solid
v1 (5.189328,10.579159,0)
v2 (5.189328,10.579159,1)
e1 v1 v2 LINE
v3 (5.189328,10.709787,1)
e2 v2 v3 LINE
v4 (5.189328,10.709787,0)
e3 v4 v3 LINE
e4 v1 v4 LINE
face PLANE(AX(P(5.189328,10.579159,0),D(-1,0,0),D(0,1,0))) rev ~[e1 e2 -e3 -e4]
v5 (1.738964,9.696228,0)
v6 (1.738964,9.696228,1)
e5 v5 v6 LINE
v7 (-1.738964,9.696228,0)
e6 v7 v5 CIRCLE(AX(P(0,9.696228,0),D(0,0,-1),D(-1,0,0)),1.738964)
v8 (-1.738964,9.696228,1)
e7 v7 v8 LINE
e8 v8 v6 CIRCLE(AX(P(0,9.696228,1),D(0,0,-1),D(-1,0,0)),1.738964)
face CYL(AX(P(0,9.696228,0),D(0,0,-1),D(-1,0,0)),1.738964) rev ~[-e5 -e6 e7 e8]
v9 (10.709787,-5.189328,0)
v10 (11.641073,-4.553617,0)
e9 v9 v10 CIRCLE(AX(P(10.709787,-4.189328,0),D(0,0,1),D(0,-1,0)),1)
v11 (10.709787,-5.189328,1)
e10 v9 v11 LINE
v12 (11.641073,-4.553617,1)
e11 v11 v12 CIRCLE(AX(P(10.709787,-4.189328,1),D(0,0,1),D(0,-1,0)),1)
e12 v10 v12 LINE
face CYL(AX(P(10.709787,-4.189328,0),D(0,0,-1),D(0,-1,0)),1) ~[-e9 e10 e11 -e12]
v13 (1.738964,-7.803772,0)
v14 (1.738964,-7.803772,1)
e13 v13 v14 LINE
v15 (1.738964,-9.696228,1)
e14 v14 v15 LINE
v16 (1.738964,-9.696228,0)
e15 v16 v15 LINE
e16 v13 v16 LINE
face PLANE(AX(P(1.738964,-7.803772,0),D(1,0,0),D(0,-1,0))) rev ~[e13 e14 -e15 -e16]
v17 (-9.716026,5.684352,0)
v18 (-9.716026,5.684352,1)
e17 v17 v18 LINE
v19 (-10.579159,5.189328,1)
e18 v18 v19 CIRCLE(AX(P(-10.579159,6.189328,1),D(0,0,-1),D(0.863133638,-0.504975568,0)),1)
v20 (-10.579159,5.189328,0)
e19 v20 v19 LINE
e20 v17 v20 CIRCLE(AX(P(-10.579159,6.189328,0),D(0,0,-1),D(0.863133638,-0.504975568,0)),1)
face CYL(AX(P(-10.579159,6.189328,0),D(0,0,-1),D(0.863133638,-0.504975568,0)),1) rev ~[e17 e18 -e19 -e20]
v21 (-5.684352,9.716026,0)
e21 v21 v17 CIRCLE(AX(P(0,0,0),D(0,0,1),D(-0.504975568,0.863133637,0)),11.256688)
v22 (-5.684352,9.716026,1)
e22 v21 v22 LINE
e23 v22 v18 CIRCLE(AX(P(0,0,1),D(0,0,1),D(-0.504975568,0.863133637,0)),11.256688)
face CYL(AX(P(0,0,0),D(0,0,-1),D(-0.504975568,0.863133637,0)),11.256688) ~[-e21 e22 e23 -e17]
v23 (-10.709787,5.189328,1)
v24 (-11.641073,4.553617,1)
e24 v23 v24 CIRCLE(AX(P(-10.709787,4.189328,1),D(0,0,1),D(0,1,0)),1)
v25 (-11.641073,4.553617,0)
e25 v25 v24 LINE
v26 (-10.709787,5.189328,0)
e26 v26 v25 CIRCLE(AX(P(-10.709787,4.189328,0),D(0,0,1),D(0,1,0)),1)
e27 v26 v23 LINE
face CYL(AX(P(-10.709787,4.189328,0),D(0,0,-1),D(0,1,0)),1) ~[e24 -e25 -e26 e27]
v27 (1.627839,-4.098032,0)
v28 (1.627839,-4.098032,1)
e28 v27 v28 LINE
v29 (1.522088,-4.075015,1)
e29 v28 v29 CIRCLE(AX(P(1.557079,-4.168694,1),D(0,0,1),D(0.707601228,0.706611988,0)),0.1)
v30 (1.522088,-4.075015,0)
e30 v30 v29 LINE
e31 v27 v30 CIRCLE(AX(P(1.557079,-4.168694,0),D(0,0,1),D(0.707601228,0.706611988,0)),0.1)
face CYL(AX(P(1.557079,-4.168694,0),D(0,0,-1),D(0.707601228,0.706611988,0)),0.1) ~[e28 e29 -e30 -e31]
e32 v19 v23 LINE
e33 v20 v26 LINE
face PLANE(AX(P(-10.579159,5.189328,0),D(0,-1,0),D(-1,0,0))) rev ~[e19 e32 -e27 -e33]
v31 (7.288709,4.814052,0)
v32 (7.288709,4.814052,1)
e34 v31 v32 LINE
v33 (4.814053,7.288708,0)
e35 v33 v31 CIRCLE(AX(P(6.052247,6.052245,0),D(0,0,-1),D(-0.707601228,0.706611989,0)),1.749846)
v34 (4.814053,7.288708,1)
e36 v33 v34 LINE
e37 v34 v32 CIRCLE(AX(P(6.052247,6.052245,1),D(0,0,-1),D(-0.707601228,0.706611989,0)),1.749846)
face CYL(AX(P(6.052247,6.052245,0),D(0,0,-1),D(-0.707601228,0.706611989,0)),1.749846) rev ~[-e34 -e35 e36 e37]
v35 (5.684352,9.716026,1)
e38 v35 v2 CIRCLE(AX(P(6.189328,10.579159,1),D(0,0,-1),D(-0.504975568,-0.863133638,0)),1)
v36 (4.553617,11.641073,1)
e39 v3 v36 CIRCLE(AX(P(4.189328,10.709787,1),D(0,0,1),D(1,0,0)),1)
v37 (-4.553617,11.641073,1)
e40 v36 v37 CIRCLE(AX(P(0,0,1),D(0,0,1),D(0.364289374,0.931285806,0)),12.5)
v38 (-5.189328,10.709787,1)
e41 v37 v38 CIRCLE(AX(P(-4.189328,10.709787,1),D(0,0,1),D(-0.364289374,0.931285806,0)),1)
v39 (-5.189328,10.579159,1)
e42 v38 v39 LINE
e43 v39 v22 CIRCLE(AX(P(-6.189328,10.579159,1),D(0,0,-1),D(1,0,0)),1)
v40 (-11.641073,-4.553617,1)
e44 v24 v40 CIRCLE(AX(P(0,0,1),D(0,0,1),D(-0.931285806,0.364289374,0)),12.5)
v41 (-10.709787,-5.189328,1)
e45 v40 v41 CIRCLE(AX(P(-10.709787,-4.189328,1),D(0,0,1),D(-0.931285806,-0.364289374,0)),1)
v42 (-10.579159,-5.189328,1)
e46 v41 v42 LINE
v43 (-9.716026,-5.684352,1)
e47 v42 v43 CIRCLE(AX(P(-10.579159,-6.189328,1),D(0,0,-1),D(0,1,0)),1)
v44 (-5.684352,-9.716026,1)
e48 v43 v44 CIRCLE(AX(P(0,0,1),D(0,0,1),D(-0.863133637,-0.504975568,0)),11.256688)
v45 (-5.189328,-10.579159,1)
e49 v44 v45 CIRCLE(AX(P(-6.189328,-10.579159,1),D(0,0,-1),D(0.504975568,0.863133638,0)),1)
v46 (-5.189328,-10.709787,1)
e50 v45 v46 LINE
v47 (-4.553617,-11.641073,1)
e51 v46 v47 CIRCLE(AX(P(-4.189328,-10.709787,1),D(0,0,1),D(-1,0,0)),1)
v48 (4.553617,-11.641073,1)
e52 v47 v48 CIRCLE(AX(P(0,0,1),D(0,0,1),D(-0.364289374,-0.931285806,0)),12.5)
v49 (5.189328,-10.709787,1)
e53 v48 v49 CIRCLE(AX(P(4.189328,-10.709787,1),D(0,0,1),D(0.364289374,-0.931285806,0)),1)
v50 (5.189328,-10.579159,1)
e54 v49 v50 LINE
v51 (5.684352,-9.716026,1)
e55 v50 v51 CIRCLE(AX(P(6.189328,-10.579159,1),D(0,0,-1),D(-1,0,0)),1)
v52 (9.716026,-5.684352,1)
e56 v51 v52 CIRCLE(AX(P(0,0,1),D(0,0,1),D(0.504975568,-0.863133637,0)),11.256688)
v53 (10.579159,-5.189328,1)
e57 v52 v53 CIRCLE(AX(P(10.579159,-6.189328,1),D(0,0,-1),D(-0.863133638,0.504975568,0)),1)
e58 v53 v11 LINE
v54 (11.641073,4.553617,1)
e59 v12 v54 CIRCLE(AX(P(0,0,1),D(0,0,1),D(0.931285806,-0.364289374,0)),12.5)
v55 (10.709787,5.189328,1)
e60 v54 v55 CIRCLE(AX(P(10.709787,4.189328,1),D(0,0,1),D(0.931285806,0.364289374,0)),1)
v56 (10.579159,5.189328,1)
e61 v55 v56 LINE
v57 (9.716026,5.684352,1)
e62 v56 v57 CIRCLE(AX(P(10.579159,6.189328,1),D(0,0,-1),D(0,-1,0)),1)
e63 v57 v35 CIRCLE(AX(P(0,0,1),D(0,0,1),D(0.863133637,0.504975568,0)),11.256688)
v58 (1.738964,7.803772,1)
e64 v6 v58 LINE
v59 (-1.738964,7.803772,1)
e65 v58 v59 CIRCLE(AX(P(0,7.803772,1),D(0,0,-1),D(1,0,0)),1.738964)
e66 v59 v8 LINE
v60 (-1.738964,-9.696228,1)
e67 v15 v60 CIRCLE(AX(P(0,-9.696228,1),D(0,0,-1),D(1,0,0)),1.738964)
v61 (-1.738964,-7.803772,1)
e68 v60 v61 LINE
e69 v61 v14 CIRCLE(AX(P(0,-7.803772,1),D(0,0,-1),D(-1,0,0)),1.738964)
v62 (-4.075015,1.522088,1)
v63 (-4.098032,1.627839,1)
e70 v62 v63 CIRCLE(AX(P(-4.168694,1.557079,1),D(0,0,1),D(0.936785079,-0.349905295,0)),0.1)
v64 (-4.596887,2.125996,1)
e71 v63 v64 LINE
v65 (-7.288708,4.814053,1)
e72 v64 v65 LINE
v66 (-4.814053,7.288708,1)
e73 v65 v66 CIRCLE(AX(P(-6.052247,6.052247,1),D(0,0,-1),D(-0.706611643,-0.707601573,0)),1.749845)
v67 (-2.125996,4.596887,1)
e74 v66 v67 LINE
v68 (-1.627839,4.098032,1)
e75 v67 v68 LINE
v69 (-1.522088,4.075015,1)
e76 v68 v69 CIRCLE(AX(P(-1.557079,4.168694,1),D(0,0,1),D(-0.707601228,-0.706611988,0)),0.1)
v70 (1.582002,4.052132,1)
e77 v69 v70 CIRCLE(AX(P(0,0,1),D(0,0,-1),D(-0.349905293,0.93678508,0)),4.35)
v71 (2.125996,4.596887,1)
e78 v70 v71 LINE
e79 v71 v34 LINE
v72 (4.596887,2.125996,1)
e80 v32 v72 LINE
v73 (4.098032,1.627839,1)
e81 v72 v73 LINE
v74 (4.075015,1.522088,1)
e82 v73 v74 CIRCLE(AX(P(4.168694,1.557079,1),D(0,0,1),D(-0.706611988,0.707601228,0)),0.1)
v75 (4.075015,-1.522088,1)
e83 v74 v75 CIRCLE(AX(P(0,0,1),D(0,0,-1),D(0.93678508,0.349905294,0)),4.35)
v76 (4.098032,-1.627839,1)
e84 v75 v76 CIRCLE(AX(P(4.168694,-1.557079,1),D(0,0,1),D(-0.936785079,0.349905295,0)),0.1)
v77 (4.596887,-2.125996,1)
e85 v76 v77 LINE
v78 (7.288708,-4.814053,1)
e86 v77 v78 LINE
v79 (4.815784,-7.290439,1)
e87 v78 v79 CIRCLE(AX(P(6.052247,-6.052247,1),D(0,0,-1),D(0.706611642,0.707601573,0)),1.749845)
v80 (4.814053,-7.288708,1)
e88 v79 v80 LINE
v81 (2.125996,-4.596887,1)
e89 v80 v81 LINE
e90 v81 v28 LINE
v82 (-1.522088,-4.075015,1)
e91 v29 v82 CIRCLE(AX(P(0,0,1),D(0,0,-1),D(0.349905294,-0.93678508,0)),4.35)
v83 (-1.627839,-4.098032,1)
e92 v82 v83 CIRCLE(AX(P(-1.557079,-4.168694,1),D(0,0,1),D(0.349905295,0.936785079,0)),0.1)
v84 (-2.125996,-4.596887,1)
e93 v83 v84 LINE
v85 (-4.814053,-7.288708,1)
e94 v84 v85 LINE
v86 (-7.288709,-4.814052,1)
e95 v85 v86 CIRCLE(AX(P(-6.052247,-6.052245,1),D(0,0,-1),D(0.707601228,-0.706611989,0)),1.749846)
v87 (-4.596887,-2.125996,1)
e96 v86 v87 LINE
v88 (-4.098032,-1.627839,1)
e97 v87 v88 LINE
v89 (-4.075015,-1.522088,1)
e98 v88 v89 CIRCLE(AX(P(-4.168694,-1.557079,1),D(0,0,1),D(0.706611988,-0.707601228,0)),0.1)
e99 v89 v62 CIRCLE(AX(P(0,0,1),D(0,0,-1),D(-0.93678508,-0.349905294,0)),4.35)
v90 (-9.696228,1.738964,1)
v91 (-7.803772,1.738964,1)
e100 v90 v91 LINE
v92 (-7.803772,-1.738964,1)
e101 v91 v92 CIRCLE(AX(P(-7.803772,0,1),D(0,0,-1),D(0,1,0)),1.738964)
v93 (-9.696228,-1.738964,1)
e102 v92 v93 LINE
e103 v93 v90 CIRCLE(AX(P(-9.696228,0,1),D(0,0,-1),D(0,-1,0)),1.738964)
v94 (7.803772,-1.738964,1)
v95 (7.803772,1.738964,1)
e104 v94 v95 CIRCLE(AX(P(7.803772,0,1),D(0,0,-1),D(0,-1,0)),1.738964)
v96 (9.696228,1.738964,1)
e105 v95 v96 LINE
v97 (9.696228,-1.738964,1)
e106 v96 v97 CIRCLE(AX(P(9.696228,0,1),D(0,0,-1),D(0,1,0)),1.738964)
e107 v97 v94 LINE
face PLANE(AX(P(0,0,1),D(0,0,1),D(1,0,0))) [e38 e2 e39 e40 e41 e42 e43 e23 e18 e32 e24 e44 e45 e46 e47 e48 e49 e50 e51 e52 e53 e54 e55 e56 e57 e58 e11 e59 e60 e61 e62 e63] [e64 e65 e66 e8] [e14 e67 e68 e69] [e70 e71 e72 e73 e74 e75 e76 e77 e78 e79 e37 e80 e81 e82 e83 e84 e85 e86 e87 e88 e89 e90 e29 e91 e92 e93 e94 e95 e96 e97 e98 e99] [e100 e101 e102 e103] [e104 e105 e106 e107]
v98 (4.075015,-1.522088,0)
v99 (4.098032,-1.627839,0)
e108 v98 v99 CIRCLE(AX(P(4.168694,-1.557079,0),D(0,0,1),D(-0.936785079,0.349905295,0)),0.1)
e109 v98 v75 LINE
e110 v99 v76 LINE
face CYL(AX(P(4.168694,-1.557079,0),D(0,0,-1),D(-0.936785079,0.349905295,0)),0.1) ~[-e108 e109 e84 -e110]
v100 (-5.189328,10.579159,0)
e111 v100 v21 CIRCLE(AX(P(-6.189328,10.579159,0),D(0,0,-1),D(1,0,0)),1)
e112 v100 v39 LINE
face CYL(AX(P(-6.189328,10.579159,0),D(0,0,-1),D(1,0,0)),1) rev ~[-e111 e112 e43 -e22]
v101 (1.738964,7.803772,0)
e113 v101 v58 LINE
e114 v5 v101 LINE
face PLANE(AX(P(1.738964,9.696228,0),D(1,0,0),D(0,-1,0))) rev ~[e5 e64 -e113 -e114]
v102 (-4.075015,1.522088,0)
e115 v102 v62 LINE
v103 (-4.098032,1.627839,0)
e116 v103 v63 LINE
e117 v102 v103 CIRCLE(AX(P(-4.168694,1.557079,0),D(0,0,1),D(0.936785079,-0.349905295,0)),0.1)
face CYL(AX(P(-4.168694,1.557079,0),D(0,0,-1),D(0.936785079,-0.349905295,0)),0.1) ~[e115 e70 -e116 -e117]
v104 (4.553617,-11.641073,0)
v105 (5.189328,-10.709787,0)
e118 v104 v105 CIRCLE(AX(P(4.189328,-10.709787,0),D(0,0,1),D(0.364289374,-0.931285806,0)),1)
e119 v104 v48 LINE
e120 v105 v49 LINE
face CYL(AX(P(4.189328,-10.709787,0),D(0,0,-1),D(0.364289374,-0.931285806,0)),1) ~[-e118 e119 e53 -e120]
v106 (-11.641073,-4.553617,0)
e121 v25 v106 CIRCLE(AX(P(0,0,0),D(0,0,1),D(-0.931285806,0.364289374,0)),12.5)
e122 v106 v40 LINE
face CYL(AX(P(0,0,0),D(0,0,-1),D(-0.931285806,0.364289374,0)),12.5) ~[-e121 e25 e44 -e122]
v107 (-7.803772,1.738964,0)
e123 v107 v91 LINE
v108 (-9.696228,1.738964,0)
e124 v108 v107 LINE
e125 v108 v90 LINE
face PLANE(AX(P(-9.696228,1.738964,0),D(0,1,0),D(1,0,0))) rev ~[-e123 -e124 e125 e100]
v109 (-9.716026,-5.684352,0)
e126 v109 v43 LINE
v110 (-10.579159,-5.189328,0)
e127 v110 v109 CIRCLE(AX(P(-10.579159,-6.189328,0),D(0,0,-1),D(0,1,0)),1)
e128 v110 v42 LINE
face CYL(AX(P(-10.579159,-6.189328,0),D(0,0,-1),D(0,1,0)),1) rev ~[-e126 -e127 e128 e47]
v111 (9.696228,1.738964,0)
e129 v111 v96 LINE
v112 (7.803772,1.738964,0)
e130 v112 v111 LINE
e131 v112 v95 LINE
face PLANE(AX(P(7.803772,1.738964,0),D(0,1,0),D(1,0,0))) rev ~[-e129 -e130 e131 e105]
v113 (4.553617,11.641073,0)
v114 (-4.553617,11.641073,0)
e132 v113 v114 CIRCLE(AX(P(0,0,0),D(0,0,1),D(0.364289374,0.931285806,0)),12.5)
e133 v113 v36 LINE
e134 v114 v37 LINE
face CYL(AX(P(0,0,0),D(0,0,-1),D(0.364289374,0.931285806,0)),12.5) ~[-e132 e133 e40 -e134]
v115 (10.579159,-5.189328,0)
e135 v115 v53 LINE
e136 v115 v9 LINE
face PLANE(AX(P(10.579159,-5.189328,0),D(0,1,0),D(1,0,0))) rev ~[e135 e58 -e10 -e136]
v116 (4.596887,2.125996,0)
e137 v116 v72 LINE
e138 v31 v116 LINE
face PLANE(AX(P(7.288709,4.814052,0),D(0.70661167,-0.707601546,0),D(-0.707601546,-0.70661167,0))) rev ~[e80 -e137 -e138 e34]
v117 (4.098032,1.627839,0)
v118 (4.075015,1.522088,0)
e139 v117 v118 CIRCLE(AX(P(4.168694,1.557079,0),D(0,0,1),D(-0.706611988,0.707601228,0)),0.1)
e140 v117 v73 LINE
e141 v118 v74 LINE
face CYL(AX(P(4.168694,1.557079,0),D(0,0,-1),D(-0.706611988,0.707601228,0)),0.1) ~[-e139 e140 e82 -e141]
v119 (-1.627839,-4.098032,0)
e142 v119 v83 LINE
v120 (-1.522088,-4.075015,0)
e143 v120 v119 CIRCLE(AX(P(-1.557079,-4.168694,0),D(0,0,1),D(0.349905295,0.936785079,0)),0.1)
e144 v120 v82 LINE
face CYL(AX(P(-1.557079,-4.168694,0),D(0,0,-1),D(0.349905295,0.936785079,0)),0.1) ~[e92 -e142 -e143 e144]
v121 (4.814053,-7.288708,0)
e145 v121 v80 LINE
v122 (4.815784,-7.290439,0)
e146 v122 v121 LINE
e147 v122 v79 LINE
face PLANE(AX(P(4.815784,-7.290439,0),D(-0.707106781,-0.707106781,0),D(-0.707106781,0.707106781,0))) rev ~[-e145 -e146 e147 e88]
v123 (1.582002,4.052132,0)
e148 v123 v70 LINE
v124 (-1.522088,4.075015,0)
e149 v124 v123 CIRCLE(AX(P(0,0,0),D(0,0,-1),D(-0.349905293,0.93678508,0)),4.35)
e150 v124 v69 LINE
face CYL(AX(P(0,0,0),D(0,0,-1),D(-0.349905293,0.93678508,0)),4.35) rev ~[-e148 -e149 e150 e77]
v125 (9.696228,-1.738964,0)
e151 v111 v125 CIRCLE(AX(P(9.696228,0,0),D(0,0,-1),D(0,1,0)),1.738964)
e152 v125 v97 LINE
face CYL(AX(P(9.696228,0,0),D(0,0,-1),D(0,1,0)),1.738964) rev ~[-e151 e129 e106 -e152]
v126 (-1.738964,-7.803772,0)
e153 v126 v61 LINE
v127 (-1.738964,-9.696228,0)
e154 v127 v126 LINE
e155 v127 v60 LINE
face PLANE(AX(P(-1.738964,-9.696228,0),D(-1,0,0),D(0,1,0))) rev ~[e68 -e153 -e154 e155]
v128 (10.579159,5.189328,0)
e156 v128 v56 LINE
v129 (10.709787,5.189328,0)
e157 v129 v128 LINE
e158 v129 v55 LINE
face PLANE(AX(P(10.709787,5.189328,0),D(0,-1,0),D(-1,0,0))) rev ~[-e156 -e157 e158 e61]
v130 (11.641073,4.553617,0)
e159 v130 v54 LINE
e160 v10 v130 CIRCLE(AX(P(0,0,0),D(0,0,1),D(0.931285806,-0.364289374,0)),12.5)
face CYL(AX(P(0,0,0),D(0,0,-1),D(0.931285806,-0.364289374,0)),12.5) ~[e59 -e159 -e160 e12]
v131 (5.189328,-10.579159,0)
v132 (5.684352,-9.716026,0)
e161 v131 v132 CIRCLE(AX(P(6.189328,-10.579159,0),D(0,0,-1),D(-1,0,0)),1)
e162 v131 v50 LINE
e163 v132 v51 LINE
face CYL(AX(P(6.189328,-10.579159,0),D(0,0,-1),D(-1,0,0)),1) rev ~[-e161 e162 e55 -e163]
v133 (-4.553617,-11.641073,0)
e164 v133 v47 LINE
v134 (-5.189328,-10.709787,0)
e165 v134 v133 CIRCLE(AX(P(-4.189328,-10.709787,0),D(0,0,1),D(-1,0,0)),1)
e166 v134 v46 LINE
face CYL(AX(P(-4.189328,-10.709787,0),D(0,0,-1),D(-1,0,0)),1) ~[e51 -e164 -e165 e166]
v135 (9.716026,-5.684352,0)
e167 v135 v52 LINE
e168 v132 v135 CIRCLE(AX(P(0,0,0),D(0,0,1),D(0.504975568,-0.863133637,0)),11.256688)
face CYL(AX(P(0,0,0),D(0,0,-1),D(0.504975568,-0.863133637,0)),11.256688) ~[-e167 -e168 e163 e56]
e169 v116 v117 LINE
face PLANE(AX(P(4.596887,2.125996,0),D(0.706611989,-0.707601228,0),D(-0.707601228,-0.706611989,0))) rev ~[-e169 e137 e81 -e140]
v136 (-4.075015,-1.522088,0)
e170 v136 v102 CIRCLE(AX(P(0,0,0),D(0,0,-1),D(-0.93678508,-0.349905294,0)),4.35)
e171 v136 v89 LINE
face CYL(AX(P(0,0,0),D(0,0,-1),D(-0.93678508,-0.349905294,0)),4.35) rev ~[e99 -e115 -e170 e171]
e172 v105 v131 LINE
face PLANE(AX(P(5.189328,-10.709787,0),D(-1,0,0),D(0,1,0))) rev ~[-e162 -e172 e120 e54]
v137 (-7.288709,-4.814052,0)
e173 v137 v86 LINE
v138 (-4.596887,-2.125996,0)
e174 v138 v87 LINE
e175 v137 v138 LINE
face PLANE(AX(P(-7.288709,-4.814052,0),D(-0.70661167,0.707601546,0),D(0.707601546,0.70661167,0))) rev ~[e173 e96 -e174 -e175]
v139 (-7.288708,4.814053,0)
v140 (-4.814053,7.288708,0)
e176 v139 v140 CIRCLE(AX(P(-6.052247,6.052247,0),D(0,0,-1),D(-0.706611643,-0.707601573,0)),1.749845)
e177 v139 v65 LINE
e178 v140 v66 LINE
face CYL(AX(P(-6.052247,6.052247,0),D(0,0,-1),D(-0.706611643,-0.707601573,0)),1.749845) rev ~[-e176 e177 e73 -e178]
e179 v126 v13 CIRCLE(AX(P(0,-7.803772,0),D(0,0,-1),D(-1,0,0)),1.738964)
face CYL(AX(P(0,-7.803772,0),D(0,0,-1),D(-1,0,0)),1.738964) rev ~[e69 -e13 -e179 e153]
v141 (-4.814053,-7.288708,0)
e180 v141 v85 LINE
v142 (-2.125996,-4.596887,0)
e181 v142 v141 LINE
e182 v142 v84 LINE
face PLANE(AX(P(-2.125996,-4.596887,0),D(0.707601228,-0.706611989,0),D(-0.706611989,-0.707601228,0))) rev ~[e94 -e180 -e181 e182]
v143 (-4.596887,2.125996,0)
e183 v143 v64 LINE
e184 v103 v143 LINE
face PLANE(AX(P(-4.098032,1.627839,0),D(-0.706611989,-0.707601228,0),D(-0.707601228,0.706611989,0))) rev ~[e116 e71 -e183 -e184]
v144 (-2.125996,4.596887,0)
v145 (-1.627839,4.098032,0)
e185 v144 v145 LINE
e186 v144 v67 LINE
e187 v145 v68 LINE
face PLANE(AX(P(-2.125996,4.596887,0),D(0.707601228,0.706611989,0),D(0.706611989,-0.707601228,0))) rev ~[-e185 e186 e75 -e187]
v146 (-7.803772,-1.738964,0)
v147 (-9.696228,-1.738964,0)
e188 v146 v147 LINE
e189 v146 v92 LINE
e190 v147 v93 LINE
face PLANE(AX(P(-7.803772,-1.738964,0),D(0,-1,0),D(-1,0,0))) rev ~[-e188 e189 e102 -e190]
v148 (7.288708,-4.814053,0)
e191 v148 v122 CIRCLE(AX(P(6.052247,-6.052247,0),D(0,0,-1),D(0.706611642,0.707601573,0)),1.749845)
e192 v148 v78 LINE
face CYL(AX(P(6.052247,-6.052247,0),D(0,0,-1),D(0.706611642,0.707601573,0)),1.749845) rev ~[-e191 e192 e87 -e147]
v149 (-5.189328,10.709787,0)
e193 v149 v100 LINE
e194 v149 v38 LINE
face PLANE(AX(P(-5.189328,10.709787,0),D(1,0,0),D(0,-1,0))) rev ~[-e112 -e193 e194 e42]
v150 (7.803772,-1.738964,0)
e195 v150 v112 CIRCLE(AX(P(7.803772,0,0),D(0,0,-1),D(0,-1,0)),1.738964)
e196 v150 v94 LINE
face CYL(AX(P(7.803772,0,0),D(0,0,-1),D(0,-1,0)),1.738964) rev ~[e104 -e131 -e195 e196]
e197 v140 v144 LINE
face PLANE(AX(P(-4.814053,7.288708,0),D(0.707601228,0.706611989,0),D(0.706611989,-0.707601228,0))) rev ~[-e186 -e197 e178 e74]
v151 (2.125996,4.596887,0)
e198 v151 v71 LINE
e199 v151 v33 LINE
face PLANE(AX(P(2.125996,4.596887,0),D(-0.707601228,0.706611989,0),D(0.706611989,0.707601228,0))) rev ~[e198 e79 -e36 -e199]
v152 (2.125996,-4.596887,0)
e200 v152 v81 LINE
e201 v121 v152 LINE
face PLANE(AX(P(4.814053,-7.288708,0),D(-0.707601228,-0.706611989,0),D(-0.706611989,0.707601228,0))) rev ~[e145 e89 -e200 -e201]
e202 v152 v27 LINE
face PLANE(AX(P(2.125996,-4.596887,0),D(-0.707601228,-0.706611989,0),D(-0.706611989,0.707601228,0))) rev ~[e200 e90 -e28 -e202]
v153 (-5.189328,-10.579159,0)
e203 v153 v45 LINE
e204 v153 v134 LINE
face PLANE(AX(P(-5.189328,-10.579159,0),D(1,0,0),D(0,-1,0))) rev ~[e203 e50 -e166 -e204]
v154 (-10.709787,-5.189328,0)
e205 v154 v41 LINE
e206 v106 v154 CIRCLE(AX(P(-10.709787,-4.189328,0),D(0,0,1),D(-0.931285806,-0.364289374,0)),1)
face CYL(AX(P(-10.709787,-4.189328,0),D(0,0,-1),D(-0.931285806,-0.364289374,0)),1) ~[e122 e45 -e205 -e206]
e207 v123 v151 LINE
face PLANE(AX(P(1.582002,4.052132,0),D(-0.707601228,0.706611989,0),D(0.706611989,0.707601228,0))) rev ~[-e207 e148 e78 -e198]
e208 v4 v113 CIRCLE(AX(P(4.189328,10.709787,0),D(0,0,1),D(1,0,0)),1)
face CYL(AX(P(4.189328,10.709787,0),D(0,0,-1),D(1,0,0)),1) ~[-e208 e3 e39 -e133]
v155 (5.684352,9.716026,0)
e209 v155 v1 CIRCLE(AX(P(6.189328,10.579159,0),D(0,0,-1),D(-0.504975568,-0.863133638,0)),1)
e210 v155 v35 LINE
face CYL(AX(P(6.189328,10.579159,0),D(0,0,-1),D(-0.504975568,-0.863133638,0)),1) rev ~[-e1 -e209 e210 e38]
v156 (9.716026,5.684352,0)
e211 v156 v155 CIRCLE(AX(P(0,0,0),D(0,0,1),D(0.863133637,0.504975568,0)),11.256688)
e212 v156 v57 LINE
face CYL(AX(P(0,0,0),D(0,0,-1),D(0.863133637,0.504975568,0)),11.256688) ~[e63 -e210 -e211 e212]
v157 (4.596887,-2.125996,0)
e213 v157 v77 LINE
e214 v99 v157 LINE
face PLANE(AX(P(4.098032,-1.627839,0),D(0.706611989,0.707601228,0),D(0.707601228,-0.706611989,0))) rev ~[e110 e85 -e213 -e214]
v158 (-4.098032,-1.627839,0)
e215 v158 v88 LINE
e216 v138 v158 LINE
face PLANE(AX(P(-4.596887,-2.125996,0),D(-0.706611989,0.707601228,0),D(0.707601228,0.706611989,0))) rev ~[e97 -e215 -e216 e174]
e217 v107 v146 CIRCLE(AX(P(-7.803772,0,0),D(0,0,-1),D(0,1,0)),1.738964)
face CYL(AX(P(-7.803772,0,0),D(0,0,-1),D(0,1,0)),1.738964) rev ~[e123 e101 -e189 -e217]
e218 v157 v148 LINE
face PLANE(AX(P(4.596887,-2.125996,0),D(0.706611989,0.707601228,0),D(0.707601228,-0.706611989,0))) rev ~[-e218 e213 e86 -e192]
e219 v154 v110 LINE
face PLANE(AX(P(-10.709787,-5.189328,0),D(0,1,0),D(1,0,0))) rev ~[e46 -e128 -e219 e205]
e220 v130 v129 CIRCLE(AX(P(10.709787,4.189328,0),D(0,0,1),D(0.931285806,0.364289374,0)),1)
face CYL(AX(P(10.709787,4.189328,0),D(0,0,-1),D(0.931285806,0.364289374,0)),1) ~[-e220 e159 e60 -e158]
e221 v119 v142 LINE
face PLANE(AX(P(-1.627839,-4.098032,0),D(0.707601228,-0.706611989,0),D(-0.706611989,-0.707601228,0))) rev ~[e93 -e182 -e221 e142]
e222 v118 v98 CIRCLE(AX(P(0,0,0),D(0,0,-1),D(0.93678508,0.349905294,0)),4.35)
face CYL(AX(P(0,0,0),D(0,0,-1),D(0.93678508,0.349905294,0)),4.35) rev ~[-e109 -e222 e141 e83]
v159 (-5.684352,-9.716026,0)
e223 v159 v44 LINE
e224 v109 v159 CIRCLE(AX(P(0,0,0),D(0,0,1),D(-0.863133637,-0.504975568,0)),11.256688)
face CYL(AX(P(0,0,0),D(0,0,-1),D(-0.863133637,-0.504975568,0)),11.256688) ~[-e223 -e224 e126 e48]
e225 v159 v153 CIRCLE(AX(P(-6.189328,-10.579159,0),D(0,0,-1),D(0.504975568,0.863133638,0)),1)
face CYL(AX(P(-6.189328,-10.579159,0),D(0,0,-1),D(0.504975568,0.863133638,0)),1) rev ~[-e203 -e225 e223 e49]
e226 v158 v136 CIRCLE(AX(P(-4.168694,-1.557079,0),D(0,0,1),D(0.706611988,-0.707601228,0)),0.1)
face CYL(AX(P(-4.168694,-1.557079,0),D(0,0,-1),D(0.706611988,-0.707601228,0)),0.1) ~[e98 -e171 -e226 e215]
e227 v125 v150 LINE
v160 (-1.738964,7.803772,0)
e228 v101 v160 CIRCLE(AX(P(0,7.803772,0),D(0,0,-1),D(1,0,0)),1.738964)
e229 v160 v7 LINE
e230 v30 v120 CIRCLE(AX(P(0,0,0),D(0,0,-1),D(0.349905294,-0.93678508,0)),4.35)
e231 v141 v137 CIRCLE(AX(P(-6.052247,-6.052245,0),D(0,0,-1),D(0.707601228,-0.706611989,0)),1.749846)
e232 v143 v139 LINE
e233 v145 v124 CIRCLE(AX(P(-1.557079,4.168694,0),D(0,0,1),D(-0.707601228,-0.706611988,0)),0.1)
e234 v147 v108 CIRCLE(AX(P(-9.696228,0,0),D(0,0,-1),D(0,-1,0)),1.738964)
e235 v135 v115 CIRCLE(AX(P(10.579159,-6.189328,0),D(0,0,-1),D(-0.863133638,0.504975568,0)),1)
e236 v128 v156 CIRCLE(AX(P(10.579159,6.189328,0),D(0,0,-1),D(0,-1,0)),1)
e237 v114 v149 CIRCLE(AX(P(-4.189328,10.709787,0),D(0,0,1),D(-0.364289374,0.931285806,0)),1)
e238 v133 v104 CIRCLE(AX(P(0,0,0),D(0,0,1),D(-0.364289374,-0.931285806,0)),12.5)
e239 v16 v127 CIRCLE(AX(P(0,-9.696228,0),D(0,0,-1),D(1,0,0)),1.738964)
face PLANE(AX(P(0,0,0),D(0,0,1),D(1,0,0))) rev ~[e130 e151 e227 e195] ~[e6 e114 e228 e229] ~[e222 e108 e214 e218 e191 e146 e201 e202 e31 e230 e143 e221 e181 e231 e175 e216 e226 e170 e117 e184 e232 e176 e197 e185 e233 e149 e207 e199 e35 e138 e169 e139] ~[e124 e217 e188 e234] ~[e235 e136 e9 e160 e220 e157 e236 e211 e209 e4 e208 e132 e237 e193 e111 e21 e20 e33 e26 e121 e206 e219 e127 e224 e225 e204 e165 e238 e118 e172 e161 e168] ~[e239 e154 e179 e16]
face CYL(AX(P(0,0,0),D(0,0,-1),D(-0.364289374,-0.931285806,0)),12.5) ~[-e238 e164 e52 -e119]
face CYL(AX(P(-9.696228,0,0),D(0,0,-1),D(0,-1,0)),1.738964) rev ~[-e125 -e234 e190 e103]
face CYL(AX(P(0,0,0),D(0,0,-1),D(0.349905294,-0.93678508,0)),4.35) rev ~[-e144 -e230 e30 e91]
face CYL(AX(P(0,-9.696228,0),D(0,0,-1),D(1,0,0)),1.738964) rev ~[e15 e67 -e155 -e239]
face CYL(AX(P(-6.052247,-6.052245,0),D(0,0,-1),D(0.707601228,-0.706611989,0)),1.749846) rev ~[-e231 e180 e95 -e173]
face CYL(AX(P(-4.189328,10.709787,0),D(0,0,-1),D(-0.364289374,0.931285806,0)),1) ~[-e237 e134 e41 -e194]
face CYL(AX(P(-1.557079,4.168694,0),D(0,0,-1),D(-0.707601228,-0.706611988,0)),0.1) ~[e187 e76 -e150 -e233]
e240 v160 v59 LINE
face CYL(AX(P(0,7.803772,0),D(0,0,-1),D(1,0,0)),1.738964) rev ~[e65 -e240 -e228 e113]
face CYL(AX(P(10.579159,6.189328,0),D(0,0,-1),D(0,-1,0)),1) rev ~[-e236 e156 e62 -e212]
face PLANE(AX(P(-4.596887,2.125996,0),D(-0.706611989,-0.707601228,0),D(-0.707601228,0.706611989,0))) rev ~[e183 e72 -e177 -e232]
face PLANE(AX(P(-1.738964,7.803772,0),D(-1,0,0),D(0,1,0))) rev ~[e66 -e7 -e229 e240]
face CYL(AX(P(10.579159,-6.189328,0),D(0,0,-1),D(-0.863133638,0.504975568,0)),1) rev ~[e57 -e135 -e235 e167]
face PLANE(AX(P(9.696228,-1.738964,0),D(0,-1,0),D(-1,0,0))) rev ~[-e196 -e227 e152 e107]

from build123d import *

# Parameters (mm, degrees)
F1_DEPTH = 1


# Not quite as in the source:
# - ends of sketch curves that miss each other by under 0.0002 mm in the source are joined


with BuildPart() as f1:
    # F0 (on Top) → F1 (new body)
    with BuildSketch(Plane.XY):
        with BuildLine():
            ThreePointArc((5.1893277963, 10.709786768), (5.015248305, 11.2735733528), (4.5536171698, 11.6410725739))
            ThreePointArc((4.5536171698, 11.6410725739), (0, 12.5), (-4.5536171698, 11.6410725739))
            ThreePointArc((-4.5536171698, 11.6410725739), (-5.015248305, 11.2735733528), (-5.1893277963, 10.709786768))
            Line((-5.1893277963, 10.709786768), (-5.1893277963, 10.5791593824))
            ThreePointArc((-5.1893277963, 10.5791593824), (-5.3218672589, 10.0816533863), (-5.6843522286, 9.716025745))
            ThreePointArc((-5.6843522286, 9.716025745), (-7.9596801612, 7.9596801612), (-9.716025745, 5.6843522286))
            ThreePointArc((-9.716025745, 5.6843522286), (-10.0816533863, 5.3218672589), (-10.5791593824, 5.1893277963))
            Line((-10.5791593824, 5.1893277963), (-10.709786768, 5.1893277963))
            ThreePointArc((-10.709786768, 5.1893277963), (-11.2735733528, 5.015248305), (-11.6410725739, 4.5536171698))
            ThreePointArc((-11.6410725739, 4.5536171698), (-12.5, 0), (-11.6410725739, -4.5536171698))
            ThreePointArc((-11.6410725739, -4.5536171698), (-11.2735733528, -5.015248305), (-10.709786768, -5.1893277963))
            Line((-10.709786768, -5.1893277963), (-10.5791593824, -5.1893277963))
            ThreePointArc((-10.5791593824, -5.1893277963), (-10.0816533863, -5.3218672589), (-9.716025745, -5.6843522286))
            ThreePointArc((-9.716025745, -5.6843522286), (-7.9596801612, -7.9596801612), (-5.6843522286, -9.716025745))
            ThreePointArc((-5.6843522286, -9.716025745), (-5.3218672589, -10.0816533863), (-5.1893277963, -10.5791593824))
            Line((-5.1893277963, -10.5791593824), (-5.1893277963, -10.709786768))
            ThreePointArc((-5.1893277963, -10.709786768), (-5.015248305, -11.2735733528), (-4.5536171698, -11.6410725739))
            ThreePointArc((-4.5536171698, -11.6410725739), (0, -12.5), (4.5536171698, -11.6410725739))
            ThreePointArc((4.5536171698, -11.6410725739), (5.015248305, -11.2735733528), (5.1893277963, -10.709786768))
            Line((5.1893277963, -10.709786768), (5.1893277963, -10.5791593824))
            ThreePointArc((5.1893277963, -10.5791593824), (5.3218672589, -10.0816533863), (5.6843522286, -9.716025745))
            ThreePointArc((5.6843522286, -9.716025745), (7.9596801612, -7.9596801612), (9.716025745, -5.6843522286))
            ThreePointArc((9.716025745, -5.6843522286), (10.0816533863, -5.3218672589), (10.5791593824, -5.1893277963))
            Line((10.5791593824, -5.1893277963), (10.709786768, -5.1893277963))
            ThreePointArc((10.709786768, -5.1893277963), (11.2735733528, -5.015248305), (11.6410725739, -4.5536171698))
            ThreePointArc((11.6410725739, -4.5536171698), (12.5, 0), (11.6410725739, 4.5536171698))
            ThreePointArc((11.6410725739, 4.5536171698), (11.2735733528, 5.015248305), (10.709786768, 5.1893277963))
            Line((10.709786768, 5.1893277963), (10.5791593824, 5.1893277963))
            ThreePointArc((10.5791593824, 5.1893277963), (10.0816533863, 5.3218672589), (9.716025745, 5.6843522286))
            ThreePointArc((9.716025745, 5.6843522286), (7.9596801612, 7.9596801612), (5.6843522286, 9.716025745))
            ThreePointArc((5.6843522286, 9.716025745), (5.3218672589, 10.0816533863), (5.1893277963, 10.5791593824))
            Line((5.1893277963, 10.5791593824), (5.1893277963, 10.709786768))
        make_face()
        with BuildLine():
            Line((-1.7389636828, -9.696227699), (-1.7389636828, -7.803772301))
            ThreePointArc((-1.7389636828, -7.803772301), (0, -6.0648086182), (1.7389636828, -7.803772301))
            Line((1.7389636828, -7.803772301), (1.7389636828, -9.696227699))
            ThreePointArc((1.7389636828, -9.696227699), (0, -11.4351913818), (-1.7389636828, -9.696227699))
        make_face(mode=Mode.SUBTRACT)
        with BuildLine():
            Line((-4.0980324058, 1.6278386791), (-4.596886989, 2.1259958547))
            Line((-4.596886989, 2.1259958547), (-7.2887076389, 4.8140532918))
            ThreePointArc((-7.2887076389, 4.8140532918), (-7.2895746597, 7.2895734489), (-4.8140532909, 7.2887076381))
            Line((-4.8140532909, 7.2887076381), (-2.1259958547, 4.596886989))
            Line((-2.1259958547, 4.596886989), (-1.6278386791, 4.0980324058))
            ThreePointArc((-1.6278386791, 4.0980324058), (-1.5783462567, 4.0709813489), (-1.5220880269, 4.0750150967))
            ThreePointArc((-1.5220880269, 4.0750150967), (0.0320676528, 4.349881799), (1.5820019575, 4.052131514))
            Line((1.5820019575, 4.052131514), (2.1259958547, 4.596886989))
            Line((2.1259958547, 4.596886989), (4.8140532909, 7.2887076381))
            ThreePointArc((4.8140532909, 7.2887076381), (7.2895746597, 7.2895734489), (7.2887088489, 4.8140520801))
            Line((7.2887088489, 4.8140520801), (4.596886989, 2.1259958547))
            Line((4.596886989, 2.1259958547), (4.0980324058, 1.6278386791))
            ThreePointArc((4.0980324058, 1.6278386791), (4.0709813489, 1.5783462567), (4.0750150967, 1.5220880269))
            ThreePointArc((4.0750150967, 1.5220880269), (4.35, 0), (4.0750150967, -1.5220880269))
            ThreePointArc((4.0750150967, -1.5220880269), (4.0709813489, -1.5783462567), (4.0980324058, -1.6278386791))
            Line((4.0980324058, -1.6278386791), (4.596886989, -2.1259958547))
            Line((4.596886989, -2.1259958547), (7.2887076389, -4.8140532918))
            ThreePointArc((7.2887076389, -4.8140532918), (7.2904398646, -7.2887076385), (4.8157843062, -7.2904386534))
            Line((4.8157843062, -7.2904386534), (4.8140532909, -7.2887076381))
            Line((4.8140532909, -7.2887076381), (2.1259958547, -4.596886989))
            Line((2.1259958547, -4.596886989), (1.6278386791, -4.0980324058))
            ThreePointArc((1.6278386791, -4.0980324058), (1.5783462567, -4.0709813489), (1.5220880269, -4.0750150967))
            ThreePointArc((1.5220880269, -4.0750150967), (0, -4.35), (-1.5220880269, -4.0750150967))
            ThreePointArc((-1.5220880269, -4.0750150967), (-1.5783462567, -4.0709813489), (-1.6278386791, -4.0980324058))
            Line((-1.6278386791, -4.0980324058), (-2.1259958547, -4.596886989))
            Line((-2.1259958547, -4.596886989), (-4.8140532909, -7.2887076381))
            ThreePointArc((-4.8140532909, -7.2887076381), (-7.2895746597, -7.2895734489), (-7.2887088489, -4.8140520801))
            Line((-7.2887088489, -4.8140520801), (-4.596886989, -2.1259958547))
            Line((-4.596886989, -2.1259958547), (-4.0980324058, -1.6278386791))
            ThreePointArc((-4.0980324058, -1.6278386791), (-4.0709813489, -1.5783462567), (-4.0750150967, -1.5220880269))
            ThreePointArc((-4.0750150967, -1.5220880269), (-4.35, 0), (-4.0750150967, 1.5220880269))
            ThreePointArc((-4.0750150967, 1.5220880269), (-4.0709813489, 1.5783462567), (-4.0980324058, 1.6278386791))
        make_face(mode=Mode.SUBTRACT)
        with BuildLine():
            Line((-7.803772301, -1.7389636828), (-9.696227699, -1.7389636828))
            ThreePointArc((-9.696227699, -1.7389636828), (-11.4351913818, 0), (-9.696227699, 1.7389636828))
            Line((-9.696227699, 1.7389636828), (-7.803772301, 1.7389636828))
            ThreePointArc((-7.803772301, 1.7389636828), (-6.0648086182, 0), (-7.803772301, -1.7389636828))
        make_face(mode=Mode.SUBTRACT)
        with BuildLine():
            Line((9.696227699, -1.7389636828), (7.803772301, -1.7389636828))
            ThreePointArc((7.803772301, -1.7389636828), (6.0648086182, 0), (7.803772301, 1.7389636828))
            Line((7.803772301, 1.7389636828), (9.696227699, 1.7389636828))
            ThreePointArc((9.696227699, 1.7389636828), (11.4351913818, 0), (9.696227699, -1.7389636828))
        make_face(mode=Mode.SUBTRACT)
        with BuildLine():
            Line((1.7389636828, 9.696227699), (1.7389636828, 7.803772301))
            ThreePointArc((1.7389636828, 7.803772301), (0, 6.0648086182), (-1.7389636828, 7.803772301))
            Line((-1.7389636828, 7.803772301), (-1.7389636828, 9.696227699))
            ThreePointArc((-1.7389636828, 9.696227699), (0, 11.4351913818), (1.7389636828, 9.696227699))
        make_face(mode=Mode.SUBTRACT)
    extrude(amount=F1_DEPTH)


solid = f1.part
